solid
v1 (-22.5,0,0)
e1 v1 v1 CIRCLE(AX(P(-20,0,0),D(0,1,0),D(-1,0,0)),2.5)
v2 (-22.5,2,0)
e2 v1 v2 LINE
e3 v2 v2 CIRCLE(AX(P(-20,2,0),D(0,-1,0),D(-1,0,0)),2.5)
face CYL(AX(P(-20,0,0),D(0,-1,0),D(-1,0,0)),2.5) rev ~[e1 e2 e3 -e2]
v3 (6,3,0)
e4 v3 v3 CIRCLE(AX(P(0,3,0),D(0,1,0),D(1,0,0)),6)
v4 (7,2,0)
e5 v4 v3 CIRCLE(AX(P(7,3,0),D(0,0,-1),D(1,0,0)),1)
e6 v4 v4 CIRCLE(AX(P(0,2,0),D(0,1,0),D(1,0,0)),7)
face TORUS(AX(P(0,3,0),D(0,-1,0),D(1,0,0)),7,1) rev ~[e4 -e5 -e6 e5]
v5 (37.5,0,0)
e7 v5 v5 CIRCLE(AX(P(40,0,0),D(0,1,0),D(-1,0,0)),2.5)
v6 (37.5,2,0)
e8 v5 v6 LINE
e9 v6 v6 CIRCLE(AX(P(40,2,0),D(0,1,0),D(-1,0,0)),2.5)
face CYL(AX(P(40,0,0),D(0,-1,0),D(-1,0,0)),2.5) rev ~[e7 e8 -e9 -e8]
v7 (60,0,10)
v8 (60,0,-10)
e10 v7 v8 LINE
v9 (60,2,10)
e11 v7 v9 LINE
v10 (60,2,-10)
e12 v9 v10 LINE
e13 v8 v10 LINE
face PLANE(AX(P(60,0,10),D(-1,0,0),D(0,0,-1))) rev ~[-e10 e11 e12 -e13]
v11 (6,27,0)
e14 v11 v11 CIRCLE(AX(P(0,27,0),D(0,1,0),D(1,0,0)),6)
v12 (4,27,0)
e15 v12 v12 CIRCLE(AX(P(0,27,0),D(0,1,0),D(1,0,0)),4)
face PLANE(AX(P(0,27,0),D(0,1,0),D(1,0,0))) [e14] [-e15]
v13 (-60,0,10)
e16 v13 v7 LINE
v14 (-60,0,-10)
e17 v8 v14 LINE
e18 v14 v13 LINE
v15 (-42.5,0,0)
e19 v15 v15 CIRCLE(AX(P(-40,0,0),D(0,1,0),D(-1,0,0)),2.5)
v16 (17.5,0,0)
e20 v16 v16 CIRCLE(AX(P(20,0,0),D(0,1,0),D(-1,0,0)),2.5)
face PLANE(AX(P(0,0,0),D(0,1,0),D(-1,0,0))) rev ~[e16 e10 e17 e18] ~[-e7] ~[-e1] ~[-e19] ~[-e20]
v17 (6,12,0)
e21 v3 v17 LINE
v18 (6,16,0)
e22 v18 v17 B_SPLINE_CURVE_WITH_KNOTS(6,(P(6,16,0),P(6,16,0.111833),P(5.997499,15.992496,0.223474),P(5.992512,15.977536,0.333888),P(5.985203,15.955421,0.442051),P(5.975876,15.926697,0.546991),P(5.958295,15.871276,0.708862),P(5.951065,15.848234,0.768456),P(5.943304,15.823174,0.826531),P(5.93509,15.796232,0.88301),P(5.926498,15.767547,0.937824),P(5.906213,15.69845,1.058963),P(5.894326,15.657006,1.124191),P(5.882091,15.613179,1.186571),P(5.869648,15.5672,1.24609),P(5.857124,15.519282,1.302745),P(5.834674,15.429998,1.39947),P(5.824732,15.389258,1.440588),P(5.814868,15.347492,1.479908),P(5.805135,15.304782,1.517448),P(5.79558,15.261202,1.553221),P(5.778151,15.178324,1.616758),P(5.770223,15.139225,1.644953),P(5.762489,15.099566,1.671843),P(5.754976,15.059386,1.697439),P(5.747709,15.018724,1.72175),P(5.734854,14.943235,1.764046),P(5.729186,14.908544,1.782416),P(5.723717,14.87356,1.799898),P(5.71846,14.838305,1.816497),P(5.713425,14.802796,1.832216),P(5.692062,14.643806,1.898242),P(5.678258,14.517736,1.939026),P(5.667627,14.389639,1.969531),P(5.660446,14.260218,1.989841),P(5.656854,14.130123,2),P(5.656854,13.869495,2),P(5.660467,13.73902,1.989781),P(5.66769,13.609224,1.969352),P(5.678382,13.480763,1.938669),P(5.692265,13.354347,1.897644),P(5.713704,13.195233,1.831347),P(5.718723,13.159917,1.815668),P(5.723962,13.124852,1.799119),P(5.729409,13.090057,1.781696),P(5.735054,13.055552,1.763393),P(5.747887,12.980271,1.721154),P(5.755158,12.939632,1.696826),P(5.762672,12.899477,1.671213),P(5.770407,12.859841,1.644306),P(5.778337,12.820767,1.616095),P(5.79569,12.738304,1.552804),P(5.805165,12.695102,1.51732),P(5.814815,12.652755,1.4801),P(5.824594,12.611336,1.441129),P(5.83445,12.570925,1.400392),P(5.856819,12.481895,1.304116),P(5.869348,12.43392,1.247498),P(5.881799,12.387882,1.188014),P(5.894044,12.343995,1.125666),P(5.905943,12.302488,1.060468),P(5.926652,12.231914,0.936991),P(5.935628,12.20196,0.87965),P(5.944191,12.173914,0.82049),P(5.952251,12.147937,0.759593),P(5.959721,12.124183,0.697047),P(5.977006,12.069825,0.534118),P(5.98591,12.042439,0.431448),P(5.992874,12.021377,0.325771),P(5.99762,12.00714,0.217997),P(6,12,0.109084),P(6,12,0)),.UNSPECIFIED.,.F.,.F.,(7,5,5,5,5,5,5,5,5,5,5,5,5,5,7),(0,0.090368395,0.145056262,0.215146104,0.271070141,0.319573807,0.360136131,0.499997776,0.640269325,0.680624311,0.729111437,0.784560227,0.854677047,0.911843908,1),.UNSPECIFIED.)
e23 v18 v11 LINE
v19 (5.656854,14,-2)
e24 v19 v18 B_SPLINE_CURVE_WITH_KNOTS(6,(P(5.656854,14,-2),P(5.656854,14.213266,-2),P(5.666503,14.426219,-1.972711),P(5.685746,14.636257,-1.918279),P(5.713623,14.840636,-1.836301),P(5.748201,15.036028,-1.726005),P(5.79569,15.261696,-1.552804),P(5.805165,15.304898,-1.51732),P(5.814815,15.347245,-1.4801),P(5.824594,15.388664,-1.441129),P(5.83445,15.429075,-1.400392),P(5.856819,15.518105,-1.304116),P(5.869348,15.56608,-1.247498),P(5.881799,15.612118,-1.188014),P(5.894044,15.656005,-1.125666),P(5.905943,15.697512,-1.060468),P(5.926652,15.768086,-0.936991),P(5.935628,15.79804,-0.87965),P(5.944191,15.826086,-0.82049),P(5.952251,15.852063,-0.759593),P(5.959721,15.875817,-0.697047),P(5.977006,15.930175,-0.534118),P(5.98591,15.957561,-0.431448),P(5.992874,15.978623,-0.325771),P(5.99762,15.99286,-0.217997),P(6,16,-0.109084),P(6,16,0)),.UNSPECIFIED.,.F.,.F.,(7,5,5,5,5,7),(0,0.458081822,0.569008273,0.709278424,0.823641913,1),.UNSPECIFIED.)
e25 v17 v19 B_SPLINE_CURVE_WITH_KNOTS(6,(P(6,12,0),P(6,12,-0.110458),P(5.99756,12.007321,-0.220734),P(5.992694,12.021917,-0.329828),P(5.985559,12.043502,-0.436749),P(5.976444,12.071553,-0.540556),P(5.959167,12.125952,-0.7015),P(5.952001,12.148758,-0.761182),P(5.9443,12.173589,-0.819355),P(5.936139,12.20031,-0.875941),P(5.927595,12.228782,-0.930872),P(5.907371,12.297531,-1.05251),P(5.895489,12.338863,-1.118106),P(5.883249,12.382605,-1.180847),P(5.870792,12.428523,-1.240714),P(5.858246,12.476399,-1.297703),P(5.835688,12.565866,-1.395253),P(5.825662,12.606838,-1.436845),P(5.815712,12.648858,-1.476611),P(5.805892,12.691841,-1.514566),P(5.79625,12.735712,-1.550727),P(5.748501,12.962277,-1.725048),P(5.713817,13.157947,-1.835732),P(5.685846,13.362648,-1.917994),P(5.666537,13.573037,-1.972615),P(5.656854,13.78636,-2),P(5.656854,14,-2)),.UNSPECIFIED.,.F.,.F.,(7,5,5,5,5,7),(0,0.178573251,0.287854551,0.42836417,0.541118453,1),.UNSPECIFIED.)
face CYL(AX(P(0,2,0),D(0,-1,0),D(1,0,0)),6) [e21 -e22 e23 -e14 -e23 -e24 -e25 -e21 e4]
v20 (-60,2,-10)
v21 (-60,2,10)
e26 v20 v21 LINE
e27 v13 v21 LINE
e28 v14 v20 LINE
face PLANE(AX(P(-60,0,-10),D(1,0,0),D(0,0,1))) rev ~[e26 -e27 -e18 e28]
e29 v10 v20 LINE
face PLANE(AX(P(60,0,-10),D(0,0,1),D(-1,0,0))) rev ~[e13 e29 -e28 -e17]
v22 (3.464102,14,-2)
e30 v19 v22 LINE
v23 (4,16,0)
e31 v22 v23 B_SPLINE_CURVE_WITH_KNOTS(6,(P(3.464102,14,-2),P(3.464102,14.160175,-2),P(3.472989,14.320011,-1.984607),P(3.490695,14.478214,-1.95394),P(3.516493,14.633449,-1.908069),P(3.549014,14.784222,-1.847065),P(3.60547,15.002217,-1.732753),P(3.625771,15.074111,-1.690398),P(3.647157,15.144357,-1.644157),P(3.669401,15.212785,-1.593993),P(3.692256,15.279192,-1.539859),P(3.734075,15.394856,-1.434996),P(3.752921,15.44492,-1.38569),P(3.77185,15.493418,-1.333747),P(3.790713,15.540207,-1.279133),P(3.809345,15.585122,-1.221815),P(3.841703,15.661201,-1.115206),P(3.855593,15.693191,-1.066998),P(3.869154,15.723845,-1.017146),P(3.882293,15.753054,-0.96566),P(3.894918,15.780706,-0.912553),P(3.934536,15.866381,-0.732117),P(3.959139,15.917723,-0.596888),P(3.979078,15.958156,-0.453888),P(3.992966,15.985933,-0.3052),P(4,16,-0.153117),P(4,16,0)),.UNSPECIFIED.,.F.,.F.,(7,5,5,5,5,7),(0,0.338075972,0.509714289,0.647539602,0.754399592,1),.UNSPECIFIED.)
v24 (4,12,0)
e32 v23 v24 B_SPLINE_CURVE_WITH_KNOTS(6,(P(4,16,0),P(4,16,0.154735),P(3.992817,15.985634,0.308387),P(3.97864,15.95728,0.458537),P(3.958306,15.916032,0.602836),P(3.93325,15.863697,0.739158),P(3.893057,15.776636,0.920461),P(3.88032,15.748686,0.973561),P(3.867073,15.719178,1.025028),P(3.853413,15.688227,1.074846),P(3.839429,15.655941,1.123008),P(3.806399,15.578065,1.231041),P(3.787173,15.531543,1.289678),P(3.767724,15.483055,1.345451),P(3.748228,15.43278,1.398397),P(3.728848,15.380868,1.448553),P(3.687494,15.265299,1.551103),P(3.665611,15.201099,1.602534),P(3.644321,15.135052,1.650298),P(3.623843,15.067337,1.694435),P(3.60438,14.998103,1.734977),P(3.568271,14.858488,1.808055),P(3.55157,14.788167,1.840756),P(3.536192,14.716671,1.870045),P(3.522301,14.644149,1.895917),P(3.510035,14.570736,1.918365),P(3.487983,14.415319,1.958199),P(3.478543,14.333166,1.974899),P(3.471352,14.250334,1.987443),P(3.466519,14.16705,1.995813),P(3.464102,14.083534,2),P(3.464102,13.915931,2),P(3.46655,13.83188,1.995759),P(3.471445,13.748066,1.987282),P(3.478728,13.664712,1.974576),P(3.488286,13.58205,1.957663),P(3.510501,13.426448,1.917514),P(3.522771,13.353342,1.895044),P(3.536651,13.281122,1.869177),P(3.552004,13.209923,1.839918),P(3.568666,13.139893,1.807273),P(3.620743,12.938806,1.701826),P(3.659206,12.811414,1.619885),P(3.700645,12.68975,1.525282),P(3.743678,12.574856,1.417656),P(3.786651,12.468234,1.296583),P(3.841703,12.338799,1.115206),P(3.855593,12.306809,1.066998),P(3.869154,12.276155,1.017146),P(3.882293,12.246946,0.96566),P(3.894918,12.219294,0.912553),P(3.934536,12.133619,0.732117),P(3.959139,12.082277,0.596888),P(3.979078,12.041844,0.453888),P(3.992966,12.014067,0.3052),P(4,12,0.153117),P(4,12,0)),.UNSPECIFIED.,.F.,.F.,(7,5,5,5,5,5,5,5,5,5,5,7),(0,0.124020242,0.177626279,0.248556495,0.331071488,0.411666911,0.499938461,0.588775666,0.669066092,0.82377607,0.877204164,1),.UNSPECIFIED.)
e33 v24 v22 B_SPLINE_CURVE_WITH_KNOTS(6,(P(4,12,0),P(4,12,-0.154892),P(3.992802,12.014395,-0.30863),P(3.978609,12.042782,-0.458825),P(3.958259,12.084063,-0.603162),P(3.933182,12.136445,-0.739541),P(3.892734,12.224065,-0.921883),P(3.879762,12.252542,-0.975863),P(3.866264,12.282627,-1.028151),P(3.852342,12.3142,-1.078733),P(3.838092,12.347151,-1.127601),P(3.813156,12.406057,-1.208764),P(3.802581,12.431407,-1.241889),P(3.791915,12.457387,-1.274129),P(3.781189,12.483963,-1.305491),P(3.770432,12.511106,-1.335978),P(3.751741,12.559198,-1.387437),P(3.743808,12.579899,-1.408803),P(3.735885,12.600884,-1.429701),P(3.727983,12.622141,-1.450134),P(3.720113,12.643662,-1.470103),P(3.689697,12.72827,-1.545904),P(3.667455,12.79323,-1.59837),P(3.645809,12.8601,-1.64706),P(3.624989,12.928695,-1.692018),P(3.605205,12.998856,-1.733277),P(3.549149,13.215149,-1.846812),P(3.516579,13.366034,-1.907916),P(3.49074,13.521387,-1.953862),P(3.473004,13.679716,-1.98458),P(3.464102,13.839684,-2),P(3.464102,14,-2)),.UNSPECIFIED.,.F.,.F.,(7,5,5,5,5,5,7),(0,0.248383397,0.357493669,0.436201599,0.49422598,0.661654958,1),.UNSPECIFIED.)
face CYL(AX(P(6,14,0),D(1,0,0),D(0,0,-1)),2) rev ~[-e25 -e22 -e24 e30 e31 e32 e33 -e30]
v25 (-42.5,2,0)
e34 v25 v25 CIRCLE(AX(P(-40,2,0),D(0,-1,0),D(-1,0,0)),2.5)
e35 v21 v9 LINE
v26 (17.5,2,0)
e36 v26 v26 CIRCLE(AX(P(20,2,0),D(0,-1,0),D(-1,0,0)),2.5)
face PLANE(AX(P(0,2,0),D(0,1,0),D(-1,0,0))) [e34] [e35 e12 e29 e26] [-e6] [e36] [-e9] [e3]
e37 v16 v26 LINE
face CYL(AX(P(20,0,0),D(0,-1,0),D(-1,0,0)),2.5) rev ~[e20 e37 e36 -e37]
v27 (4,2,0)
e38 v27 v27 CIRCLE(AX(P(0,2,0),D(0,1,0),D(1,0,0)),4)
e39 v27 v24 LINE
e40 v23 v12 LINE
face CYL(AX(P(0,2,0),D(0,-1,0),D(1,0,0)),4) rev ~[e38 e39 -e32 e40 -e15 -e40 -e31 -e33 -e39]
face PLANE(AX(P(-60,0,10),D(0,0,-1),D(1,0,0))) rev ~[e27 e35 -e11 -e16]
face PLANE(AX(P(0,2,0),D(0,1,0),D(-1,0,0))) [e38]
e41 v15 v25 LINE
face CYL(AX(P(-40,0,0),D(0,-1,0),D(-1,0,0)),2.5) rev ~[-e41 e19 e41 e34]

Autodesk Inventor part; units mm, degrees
ref_plane "YZ Plane" through (0, 0, 0) normal (1, 0, 0) x (0, 1, 0)
ref_plane "XZ Plane" through (0, 0, 0) normal (0, 1, 0) x (-1, 0, 0)
sketch "Sketch1" plane through (0, 0, 0) normal (0, 1, 0) x (-1, 0, 0)
  line L0 (60, 10) -> (-60, 10)
  line L1 (-60, 10) -> (-60, -10)
  line L2 (-60, -10) -> (60, -10)
  line L3 (60, -10) -> (60, 10)
  line L4 (60, 10) -> (-60, -10) construction
  line L5 (-60, 10) -> (60, -10) construction
  line L6 (0, 0) -> (20, 0)
  line L7 (20, 0) -> (40, 0)
  line L8 (0, 0) -> (-20, 0)
  line L9 (-20, 0) -> (-40, 0)
  circle A0 centre (-20, 0) radius 2.5
  circle A1 centre (-40, 0) radius 2.5
  circle A2 centre (20, 0) radius 2.5
  circle A3 centre (40, 0) radius 2.5
  dimension "d0" = 120
  dimension "d1" = 20
  dimension "d2" = 20
  dimension "d3" = 20
  dimension "d4" = 20
  dimension "d5" = 20
  dimension "d6" = 5
  dimension "d7" = 5
  dimension "d8" = 5
  dimension "d9" = 5
extrude "Extrusion1" add sketch "Sketch1" along normal blind 2
sketch "Sketch2" plane through (0, 2, 0) normal (0, 1, 0) x (1, 0, 0)
  circle A0 centre (0, 0) radius 4
  circle A1 centre (0, 0) radius 6
  dimension "d12" = 8
  dimension "d13" = 12
extrude "Extrusion2" add sketch "Sketch2" along normal blind 25
fillet "Fillet1" radius 1 1 edges at (-6, 2, 0)
ref_plane "Work Plane1" through (6, 2, 0) normal (1, 0, 0) x (0, 0, -1)
sketch "Sketch3" plane through (6, 2, 0) normal (1, 0, 0) x (0, 0, -1)
  line L0 (0, 0) -> (0, 12)
  circle A0 centre (0, 12) radius 2
  point P0 (0, -2)
  dimension "d17" = 12
  dimension "d18" = 4
extrude "Extrusion3" cut sketch "Sketch3" against normal blind 5
thread "Thread1" size "M4x0.7" class "6H" standard "ANSI Metric M Profile" length 15
properties part number "2020_ax_connector" material "Aluminum 6061"
